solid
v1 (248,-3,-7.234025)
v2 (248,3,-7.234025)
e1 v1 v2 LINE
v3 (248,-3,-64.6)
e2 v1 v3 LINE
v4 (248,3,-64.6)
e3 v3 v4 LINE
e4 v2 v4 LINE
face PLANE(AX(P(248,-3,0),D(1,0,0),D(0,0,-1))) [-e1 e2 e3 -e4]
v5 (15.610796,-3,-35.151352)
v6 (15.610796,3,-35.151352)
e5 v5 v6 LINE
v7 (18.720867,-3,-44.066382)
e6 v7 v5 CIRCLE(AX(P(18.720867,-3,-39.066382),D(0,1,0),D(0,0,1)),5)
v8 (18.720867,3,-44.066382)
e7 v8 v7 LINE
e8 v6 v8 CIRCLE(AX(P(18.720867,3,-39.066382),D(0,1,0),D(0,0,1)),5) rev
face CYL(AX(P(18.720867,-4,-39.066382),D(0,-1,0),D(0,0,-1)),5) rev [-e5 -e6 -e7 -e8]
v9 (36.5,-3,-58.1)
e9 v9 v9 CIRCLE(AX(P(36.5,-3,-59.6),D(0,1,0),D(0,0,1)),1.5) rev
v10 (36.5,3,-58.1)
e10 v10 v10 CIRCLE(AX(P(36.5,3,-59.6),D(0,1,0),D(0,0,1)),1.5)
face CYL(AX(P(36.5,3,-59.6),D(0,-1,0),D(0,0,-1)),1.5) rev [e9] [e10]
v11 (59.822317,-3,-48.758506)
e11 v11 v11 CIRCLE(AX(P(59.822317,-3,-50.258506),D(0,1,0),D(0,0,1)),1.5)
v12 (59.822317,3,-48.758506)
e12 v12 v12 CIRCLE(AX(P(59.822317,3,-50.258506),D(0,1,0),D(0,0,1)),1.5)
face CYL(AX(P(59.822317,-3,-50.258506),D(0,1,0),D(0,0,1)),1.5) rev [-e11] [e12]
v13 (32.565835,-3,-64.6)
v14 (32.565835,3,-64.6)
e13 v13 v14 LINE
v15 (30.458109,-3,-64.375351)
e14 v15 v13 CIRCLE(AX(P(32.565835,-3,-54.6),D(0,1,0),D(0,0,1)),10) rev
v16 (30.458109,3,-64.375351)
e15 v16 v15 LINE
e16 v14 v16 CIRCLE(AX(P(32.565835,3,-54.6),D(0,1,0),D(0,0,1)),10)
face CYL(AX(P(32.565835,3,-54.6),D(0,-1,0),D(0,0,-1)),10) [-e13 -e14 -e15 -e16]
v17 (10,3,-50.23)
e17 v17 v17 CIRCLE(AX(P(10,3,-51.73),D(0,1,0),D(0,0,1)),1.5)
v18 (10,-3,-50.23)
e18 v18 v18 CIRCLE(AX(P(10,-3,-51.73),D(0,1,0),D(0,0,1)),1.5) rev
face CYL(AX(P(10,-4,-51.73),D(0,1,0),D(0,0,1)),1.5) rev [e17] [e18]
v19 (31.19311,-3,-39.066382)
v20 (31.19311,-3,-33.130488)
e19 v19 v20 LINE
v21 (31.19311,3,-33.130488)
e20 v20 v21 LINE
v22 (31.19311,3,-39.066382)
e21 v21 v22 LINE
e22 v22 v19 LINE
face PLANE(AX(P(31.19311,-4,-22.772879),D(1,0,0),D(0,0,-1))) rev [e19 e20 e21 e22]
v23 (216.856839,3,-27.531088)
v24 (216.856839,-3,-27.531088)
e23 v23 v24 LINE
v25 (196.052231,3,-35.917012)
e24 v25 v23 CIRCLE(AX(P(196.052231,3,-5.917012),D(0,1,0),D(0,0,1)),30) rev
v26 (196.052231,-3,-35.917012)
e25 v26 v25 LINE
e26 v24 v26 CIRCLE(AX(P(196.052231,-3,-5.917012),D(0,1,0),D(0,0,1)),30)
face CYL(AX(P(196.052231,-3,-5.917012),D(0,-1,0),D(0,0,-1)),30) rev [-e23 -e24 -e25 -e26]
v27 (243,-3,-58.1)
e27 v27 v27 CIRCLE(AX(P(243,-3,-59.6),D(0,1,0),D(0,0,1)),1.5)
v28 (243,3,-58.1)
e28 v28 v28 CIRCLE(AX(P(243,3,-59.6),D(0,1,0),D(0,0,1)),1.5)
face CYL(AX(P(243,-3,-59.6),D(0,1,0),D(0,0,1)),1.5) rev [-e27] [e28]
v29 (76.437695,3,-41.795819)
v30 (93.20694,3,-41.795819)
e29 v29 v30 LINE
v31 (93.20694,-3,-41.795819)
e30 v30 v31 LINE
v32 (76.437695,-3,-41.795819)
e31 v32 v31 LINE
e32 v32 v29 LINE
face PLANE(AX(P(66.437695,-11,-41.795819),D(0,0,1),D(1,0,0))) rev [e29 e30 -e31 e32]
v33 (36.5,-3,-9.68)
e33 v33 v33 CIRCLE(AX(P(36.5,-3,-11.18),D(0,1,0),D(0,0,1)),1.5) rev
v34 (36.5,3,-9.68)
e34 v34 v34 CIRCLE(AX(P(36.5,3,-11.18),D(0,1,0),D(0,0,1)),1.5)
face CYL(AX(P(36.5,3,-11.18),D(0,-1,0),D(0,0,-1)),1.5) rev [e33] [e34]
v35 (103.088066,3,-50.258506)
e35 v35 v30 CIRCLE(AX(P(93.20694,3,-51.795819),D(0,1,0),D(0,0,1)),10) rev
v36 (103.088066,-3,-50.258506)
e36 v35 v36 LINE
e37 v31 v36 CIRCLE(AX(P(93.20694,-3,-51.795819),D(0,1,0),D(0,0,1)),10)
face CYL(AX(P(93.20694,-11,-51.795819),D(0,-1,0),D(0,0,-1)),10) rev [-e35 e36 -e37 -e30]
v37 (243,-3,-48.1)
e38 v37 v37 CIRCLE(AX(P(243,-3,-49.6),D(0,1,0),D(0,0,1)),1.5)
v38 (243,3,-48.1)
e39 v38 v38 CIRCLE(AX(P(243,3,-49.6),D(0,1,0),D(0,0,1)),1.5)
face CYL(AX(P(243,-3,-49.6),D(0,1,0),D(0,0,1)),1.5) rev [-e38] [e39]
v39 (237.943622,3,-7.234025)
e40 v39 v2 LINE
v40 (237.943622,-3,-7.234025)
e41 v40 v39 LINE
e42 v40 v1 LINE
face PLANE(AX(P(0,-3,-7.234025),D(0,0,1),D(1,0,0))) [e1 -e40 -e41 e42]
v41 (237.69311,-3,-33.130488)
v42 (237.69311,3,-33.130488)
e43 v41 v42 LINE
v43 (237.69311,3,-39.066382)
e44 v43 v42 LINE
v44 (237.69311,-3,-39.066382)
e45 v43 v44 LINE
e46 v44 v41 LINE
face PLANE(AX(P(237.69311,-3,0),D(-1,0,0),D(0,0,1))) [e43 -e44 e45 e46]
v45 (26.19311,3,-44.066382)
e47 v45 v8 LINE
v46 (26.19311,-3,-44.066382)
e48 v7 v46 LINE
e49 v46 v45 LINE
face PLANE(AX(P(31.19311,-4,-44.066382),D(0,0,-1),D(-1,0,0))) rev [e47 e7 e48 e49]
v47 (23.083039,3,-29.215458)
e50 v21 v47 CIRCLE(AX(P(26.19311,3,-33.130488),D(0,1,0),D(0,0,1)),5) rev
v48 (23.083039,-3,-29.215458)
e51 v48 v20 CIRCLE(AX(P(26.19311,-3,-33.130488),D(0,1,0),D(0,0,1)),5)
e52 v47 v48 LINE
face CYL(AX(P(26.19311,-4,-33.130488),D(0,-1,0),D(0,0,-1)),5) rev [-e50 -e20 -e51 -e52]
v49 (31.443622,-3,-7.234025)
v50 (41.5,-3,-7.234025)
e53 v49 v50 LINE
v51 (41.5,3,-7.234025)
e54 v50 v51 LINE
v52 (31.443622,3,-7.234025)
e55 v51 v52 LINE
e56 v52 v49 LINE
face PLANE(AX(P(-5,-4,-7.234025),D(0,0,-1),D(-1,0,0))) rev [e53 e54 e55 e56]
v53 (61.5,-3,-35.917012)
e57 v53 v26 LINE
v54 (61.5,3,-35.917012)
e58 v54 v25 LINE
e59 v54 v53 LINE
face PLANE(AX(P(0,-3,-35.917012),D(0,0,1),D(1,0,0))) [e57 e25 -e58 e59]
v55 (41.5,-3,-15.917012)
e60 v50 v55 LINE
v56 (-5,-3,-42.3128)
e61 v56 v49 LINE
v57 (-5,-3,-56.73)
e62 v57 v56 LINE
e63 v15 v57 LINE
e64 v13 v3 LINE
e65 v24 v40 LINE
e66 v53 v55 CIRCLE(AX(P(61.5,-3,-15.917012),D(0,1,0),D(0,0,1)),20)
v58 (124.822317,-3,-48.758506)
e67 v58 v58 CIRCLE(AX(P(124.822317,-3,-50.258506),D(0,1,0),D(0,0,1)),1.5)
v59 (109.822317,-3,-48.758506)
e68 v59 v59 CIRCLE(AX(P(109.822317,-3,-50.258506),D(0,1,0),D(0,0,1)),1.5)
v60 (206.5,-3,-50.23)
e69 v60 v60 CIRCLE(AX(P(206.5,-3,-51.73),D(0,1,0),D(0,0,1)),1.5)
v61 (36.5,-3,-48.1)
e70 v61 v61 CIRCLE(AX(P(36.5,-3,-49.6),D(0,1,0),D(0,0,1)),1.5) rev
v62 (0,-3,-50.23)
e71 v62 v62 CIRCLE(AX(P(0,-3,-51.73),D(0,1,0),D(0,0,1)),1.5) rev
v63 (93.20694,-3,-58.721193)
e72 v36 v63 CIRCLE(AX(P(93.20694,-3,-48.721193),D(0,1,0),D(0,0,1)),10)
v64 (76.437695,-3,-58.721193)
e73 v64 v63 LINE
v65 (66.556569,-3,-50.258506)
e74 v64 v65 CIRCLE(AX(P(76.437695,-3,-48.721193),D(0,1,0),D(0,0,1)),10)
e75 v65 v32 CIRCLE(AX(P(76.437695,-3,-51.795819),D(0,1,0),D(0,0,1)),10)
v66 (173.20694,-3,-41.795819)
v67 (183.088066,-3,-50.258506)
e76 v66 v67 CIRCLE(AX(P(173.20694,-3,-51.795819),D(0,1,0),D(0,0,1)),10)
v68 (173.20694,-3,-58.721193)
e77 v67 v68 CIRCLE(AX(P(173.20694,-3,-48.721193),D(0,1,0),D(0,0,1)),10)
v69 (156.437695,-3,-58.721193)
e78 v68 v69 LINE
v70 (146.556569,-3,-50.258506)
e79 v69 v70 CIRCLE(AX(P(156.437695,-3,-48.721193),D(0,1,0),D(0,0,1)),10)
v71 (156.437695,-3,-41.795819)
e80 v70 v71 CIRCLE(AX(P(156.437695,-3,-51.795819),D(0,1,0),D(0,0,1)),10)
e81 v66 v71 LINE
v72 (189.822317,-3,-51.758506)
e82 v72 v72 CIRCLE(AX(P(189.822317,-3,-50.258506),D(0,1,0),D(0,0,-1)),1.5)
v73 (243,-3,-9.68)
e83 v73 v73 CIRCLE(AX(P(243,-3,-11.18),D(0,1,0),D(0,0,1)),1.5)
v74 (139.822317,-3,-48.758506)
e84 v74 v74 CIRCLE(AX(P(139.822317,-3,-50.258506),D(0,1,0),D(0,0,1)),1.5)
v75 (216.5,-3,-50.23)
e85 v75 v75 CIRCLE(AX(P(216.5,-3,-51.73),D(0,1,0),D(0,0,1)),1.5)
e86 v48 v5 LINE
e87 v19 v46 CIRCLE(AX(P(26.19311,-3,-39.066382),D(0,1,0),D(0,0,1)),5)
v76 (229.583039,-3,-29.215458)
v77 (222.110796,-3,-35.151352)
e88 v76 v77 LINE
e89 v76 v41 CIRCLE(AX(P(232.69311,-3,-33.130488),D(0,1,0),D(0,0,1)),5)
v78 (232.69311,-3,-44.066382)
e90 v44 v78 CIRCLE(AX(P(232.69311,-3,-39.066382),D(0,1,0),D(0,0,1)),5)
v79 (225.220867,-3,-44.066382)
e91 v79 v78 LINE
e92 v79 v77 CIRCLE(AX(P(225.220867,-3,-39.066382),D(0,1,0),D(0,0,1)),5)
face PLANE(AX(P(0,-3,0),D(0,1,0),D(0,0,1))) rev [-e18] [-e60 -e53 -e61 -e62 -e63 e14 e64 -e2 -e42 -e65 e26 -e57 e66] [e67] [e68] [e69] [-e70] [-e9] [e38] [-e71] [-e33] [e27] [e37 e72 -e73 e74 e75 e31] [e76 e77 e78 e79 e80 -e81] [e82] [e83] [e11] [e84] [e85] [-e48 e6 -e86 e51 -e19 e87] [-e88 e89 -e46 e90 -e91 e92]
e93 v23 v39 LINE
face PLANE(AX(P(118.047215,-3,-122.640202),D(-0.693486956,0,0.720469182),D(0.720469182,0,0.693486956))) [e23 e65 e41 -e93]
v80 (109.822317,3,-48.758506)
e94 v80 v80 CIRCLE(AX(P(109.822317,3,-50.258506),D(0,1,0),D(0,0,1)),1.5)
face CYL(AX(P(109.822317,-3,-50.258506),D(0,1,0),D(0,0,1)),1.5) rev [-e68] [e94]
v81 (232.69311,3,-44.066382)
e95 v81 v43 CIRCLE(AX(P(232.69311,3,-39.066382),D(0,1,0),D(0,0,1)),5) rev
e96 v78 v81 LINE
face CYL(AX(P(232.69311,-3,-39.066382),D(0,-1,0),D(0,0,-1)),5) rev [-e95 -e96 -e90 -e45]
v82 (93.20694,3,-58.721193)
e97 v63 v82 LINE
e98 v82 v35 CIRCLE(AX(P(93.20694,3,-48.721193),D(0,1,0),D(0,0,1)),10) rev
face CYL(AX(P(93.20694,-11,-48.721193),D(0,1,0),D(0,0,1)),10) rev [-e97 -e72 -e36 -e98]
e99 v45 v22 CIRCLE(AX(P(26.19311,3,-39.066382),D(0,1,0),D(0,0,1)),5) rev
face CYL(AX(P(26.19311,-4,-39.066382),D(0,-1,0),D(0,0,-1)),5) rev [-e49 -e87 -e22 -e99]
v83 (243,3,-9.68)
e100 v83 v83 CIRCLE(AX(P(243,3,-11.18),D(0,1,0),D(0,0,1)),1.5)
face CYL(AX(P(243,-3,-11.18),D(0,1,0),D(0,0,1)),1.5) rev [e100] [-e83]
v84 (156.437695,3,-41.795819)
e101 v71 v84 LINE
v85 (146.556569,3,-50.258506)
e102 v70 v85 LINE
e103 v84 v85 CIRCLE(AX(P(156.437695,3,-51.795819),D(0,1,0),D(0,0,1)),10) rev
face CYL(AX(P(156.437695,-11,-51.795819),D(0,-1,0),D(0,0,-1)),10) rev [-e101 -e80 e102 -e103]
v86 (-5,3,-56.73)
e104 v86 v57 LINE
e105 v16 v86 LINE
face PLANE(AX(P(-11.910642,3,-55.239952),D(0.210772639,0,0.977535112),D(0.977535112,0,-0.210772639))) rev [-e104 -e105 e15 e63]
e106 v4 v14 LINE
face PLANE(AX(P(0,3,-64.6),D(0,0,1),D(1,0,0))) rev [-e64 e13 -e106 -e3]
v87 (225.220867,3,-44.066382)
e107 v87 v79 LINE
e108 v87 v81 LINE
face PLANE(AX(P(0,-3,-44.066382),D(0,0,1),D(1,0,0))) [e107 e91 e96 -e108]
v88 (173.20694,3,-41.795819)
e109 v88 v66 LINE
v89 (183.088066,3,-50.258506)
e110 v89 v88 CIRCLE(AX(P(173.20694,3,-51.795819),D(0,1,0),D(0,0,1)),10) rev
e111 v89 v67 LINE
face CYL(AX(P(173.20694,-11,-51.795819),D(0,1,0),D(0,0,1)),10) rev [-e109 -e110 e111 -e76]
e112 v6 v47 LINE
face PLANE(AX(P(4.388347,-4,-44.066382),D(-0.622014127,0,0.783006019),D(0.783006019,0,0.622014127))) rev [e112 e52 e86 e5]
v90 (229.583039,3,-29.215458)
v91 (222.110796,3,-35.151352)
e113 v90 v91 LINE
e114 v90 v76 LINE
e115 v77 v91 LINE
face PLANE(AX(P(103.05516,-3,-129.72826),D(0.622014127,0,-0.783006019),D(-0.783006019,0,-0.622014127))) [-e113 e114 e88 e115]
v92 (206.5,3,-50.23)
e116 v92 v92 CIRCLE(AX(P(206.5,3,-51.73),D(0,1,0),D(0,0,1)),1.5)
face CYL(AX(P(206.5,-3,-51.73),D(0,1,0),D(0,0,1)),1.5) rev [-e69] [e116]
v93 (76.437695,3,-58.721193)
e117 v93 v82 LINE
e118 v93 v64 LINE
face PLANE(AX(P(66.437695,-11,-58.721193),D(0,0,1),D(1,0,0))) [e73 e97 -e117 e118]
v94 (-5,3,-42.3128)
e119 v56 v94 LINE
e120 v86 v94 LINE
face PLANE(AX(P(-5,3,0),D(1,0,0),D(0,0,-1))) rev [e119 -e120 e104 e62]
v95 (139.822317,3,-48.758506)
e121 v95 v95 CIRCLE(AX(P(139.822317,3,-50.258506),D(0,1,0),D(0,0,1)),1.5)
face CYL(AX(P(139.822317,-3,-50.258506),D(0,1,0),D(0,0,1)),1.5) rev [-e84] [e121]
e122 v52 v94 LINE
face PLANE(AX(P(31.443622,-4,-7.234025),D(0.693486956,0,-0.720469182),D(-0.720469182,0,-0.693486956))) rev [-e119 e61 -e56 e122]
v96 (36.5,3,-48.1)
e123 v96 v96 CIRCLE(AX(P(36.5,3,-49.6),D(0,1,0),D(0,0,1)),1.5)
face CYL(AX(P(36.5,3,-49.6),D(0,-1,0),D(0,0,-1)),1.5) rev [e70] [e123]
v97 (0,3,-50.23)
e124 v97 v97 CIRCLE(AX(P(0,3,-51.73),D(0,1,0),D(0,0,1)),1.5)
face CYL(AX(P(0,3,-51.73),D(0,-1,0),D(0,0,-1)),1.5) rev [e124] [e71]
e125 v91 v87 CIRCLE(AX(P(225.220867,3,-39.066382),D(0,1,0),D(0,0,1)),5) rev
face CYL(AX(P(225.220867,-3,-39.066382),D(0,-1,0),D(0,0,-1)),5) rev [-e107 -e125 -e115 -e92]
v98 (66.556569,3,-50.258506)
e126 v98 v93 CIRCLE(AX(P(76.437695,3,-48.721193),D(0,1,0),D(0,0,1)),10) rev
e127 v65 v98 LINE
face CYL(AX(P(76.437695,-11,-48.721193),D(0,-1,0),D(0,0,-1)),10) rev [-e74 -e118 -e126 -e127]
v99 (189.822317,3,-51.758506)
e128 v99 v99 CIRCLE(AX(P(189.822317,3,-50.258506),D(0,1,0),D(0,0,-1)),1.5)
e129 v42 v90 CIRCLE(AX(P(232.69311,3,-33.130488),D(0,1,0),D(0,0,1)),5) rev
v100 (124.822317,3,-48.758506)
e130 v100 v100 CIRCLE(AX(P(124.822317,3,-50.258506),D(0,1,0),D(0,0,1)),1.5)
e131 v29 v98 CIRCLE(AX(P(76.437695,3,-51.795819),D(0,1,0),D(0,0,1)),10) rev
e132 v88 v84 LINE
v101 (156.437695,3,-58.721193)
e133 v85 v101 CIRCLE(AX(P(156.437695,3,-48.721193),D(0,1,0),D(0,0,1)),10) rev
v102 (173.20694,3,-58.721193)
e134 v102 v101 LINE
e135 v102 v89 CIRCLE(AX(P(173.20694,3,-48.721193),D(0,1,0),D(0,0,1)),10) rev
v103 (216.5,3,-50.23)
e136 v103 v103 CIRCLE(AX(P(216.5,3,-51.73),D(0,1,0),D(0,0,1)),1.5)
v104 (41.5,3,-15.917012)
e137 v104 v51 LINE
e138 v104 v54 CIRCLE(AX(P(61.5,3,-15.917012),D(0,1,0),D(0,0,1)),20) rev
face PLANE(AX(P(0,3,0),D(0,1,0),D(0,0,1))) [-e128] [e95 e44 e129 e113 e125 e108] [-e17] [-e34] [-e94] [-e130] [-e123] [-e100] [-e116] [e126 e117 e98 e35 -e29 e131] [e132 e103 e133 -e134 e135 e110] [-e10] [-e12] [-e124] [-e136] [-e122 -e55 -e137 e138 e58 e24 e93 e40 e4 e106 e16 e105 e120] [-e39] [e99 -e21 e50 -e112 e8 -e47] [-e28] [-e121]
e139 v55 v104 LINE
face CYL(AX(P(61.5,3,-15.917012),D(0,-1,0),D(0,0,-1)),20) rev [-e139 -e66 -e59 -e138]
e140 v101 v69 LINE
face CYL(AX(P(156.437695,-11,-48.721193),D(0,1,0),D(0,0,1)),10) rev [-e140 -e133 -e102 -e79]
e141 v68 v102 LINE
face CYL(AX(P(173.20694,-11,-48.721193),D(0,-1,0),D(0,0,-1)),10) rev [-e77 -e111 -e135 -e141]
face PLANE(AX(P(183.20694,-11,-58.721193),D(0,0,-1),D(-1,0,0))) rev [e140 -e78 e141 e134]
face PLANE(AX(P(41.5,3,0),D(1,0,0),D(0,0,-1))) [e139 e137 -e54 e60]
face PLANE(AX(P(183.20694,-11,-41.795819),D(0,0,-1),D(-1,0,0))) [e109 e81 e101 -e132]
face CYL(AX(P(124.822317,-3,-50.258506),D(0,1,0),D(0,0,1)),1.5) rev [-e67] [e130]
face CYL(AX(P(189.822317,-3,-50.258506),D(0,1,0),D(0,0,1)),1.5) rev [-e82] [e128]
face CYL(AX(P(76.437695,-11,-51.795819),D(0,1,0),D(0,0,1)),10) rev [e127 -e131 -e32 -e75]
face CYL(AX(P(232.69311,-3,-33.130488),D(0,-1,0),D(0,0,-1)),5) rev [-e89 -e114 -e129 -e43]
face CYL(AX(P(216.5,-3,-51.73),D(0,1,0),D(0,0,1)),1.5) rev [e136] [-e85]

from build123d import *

# Parameters (mm, degrees)
SKETCH1_R           = 1.5
BOSS_EXTRUDE1_DEPTH = 3
SKETCH4_R           = 1.5
CUT_EXTRUDE2_DEPTH  = 7
SKETCH5_W           = 46.5
SKETCH5_H           = 2
CUT_EXTRUDE3_DEPTH  = 7
CUT_EXTRUDE4_DEPTH  = 7
CUT_EXTRUDE5_DEPTH  = 7
BOSS_EXTRUDE2_START = -6
SKETCH8_R           = 1.5
BOSS_EXTRUDE2_DEPTH = 6
SKETCH9_R           = 1.5
CUT_EXTRUDE6_DEPTH  = 6
SKETCH10_R          = 1.5
CUT_EXTRUDE7_DEPTH  = 6
SKETCH11_W          = 36.769244088
SKETCH11_H          = 16.925373541
CUT_EXTRUDE8_DEPTH  = 14
FILLET2_R           = 5
FILLET3_R           = 10
FILLET4_R           = 20
FILLET5_R           = 30
FILLET6_R           = 10


with BuildPart() as part:
    # Sketch1 → Boss-Extrude1 (new body)
    # profile 1 of 4: a face of its own
    with BuildSketch(Plane(origin=(0, 0, 0), x_dir=(1, 0, 0), z_dir=(0, 1, 0))):
        Polygon((5, 16.666723622), (5, 56.73), (-5, 56.73), (-5, 5.234024539), (5, 5.234024539), (31.5, 5.234024539), (41.5, 5.234024539), (41.5, 64.6), (31.5, 64.6), (31.5, 54.48), (31.5, 16.666723622), align=None)
        with Locations(Location((0, 10.18, 0), (0, 0, 270))):
            Circle(SKETCH1_R, mode=Mode.SUBTRACT)
        with Locations(Location((36.5, 11.18, 0), (0, 0, 270))):
            Circle(SKETCH1_R, mode=Mode.SUBTRACT)
        with Locations(Location((0, 51.73, 0), (0, 0, 270))):
            Circle(SKETCH1_R, mode=Mode.SUBTRACT)
        with Locations(Location((36.5, 49.6, 0), (0, 0, 270))):
            Circle(SKETCH1_R, mode=Mode.SUBTRACT)
        with Locations(Location((36.5, 59.6, 0), (0, 0, 270))):
            Circle(SKETCH1_R, mode=Mode.SUBTRACT)
    # profile 2 of 4: a face of its own
    with BuildSketch(Plane(origin=(0, 0, 0), x_dir=(1, 0, 0), z_dir=(0, 1, 0))):
        Polygon((-5, 56.73), (5, 56.73), (31.5, 54.48), (31.5, 64.6), align=None)
    # profile 3 of 4: a face of its own
    with BuildSketch(Plane(origin=(0, 0, 0), x_dir=(1, 0, 0), z_dir=(0, 1, 0))):
        Polygon((5, 16.666723622), (5, 56.73), (-5, 56.73), (-5, 5.234024539), (5, 5.234024539), (31.5, 5.234024539), (41.5, 5.234024539), (41.5, 64.6), (31.5, 64.6), (31.5, 54.48), (31.5, 16.666723622), align=None)
        with Locations(Location((0, 10.18, 0), (0, 0, 270))):
            Circle(SKETCH1_R, mode=Mode.SUBTRACT)
        with Locations(Location((36.5, 11.18, 0), (0, 0, 270))):
            Circle(SKETCH1_R, mode=Mode.SUBTRACT)
        with Locations(Location((0, 51.73, 0), (0, 0, 270))):
            Circle(SKETCH1_R, mode=Mode.SUBTRACT)
        with Locations(Location((36.5, 49.6, 0), (0, 0, 270))):
            Circle(SKETCH1_R, mode=Mode.SUBTRACT)
        with Locations(Location((36.5, 59.6, 0), (0, 0, 270))):
            Circle(SKETCH1_R, mode=Mode.SUBTRACT)
    # profile 4 of 4: a face of its own
    with BuildSketch(Plane(origin=(0, 0, 0), x_dir=(1, 0, 0), z_dir=(0, 1, 0))):
        Polygon((31.5, 54.48), (5, 56.73), (5, 16.666723622), (31.5, 16.666723622), align=None)
    extrude(amount=BOSS_EXTRUDE1_DEPTH)

    # Sketch4 → Cut-Extrude2 (cut)
    with BuildSketch(Plane(origin=(0, 3, 0), x_dir=(1, 0, 0), z_dir=(0, 1, 0))):
        with Locations(Location((10, 51.73, 0), (0, 0, 270))):
            Circle(SKETCH4_R)
    extrude(amount=-CUT_EXTRUDE2_DEPTH, mode=Mode.SUBTRACT)

    # Sketch5 → Cut-Extrude3 (cut)
    with BuildSketch(Plane(origin=(0, 3, 0), x_dir=(1, 0, 0), z_dir=(0, 1, 0))):
        with Locations((18.25, 6.234024539)):
            Rectangle(SKETCH5_W, SKETCH5_H)
    extrude(amount=-CUT_EXTRUDE3_DEPTH, mode=Mode.SUBTRACT)

    # Sketch6 → Cut-Extrude4 (cut)
    with BuildSketch(Plane(origin=(0, 3, 0), x_dir=(1, 0, 0), z_dir=(0, 1, 0))):
        Polygon((31.443621834, 7.234024539), (-5, 42.312799573), (-5, 7.234024539), align=None)
    extrude(amount=-CUT_EXTRUDE4_DEPTH, mode=Mode.SUBTRACT)

    # Sketch7 → Cut-Extrude5 (cut)
    with BuildSketch(Plane(origin=(0, 3, 0), x_dir=(1, 0, 0), z_dir=(0, 1, 0))):
        Polygon((31.193110027, 22.772878628), (31.193110027, 44.066382221), (4.388346681, 44.066382221), align=None)
    extrude(amount=-CUT_EXTRUDE5_DEPTH, mode=Mode.SUBTRACT)

    # Sketch8 → Boss-Extrude2 (add)
    # profile 1 of 3: a face of its own
    with BuildSketch(Plane(origin=(0, 3, 0), x_dir=(1, 0, 0), z_dir=(0, 1, 0)).offset(BOSS_EXTRUDE2_START)):
        Polygon((238, 64.6), (41.5, 64.6), (41.5, 35.917012269), (208.144634928, 35.917012269), (201.5, 42.312799573), (201.5, 56.73), align=None)
    # profile 2 of 3: a face of its own
    with BuildSketch(Plane(origin=(0, 3, 0), x_dir=(1, 0, 0), z_dir=(0, 1, 0)).offset(BOSS_EXTRUDE2_START)):
        Polygon((237.943621834, 7.234024539), (248, 7.234024539), (248, 64.6), (238, 64.6), (201.5, 56.73), (201.5, 42.312799573), align=None)
        with Locations(Location((243, 11.18, 0), (0, 0, 270))):
            Circle(SKETCH8_R, mode=Mode.SUBTRACT)
        with Locations(Location((243, 59.6, 0), (0, 0, 270))):
            Circle(SKETCH8_R, mode=Mode.SUBTRACT)
        with Locations(Location((243, 49.6, 0), (0, 0, 270))):
            Circle(SKETCH8_R, mode=Mode.SUBTRACT)
        with Locations(Location((216.5, 51.73, 0), (0, 0, 270))):
            Circle(SKETCH8_R, mode=Mode.SUBTRACT)
        with Locations(Location((206.5, 51.73, 0), (0, 0, 270))):
            Circle(SKETCH8_R, mode=Mode.SUBTRACT)
        Polygon((237.693110027, 44.066382221), (237.693110027, 22.772878628), (210.888346681, 44.066382221), align=None, mode=Mode.SUBTRACT)
    # profile 3 of 3: a face of its own
    with BuildSketch(Plane(origin=(0, 3, 0), x_dir=(1, 0, 0), z_dir=(0, 1, 0)).offset(BOSS_EXTRUDE2_START)):
        Polygon((41.5, 35.917012269), (41.5, 64.6), (31.5, 64.6), (-5, 56.73), (-5, 42.312799573), (31.443621834, 7.234024539), (41.5, 7.234024539), align=None)
        with Locations(Location((36.5, 11.18, 0), (0, 0, 270))):
            Circle(SKETCH8_R, mode=Mode.SUBTRACT)
        Polygon((31.193110027, 22.772878628), (4.388346681, 44.066382221), (31.193110027, 44.066382221), align=None, mode=Mode.SUBTRACT)
        with Locations(Location((36.5, 49.6, 0), (0, 0, 270))):
            Circle(SKETCH8_R, mode=Mode.SUBTRACT)
        with Locations(Location((0, 51.73, 0), (0, 0, 270))):
            Circle(SKETCH8_R, mode=Mode.SUBTRACT)
        with Locations(Location((10, 51.73, 0), (0, 0, 270))):
            Circle(SKETCH8_R, mode=Mode.SUBTRACT)
        with Locations(Location((36.5, 59.6, 0), (0, 0, 270))):
            Circle(SKETCH8_R, mode=Mode.SUBTRACT)
    extrude(amount=BOSS_EXTRUDE2_DEPTH)

    # Sketch9 → Cut-Extrude6 (cut)
    with BuildSketch(Plane(origin=(0, 3, 0), x_dir=(1, 0, 0), z_dir=(0, 1, 0))):
        with Locations(Location((59.822317464, 50.258506135, 0), (0, 0, 270))):
            Circle(SKETCH9_R)
        with Locations(Location((189.822317464, 50.258506135, 0), (0, 0, 90))):
            Circle(SKETCH9_R)
        with Locations(Location((124.822317464, 50.258506135, 0), (0, 0, 270))):
            Circle(SKETCH9_R)
    extrude(amount=-CUT_EXTRUDE6_DEPTH, mode=Mode.SUBTRACT)

    # Sketch10 → Cut-Extrude7 (cut)
    with BuildSketch(Plane(origin=(0, 3, 0), x_dir=(1, 0, 0), z_dir=(0, 1, 0))):
        with Locations(Location((124.822317464, 50.258506135, 0), (0, 0, 270))):
            Circle(SKETCH10_R)
        with Locations(Location((109.822317464, 50.258506135, 0), (0, 0, 270))):
            Circle(SKETCH10_R)
        with Locations(Location((139.822317464, 50.258506135, 0), (0, 0, 270))):
            Circle(SKETCH10_R)
    extrude(amount=-CUT_EXTRUDE7_DEPTH, mode=Mode.SUBTRACT)

    # Sketch11 → Cut-Extrude8 (cut)
    with BuildSketch(Plane(origin=(0, 3, 0), x_dir=(1, 0, 0), z_dir=(0, 1, 0))):
        with Locations((84.822317464, 50.258506135)):
            Rectangle(SKETCH11_W, SKETCH11_H)
        with Locations((164.822317464, 50.258506135)):
            Rectangle(SKETCH11_W, SKETCH11_H)
    extrude(amount=-CUT_EXTRUDE8_DEPTH, mode=Mode.SUBTRACT)

    # Fillet2
    fillet2_edges = [part.edges().sort_by_distance(p)[0] for p in [
        (237.693110027, 0, -22.772878628),
        (237.693110027, 0, -44.066382221),
        (210.888346681, 0, -44.066382221),
        (31.193110027, 0, -22.772878628),
        (4.388346681, 0, -44.066382221),
        (31.193110027, 0, -44.066382221),
    ]]
    fillet(fillet2_edges, radius=FILLET2_R)

    # Fillet3
    # the kernel refuses this fillet: 10 mm, written as the material it adds along each edge
    with BuildSketch(Plane(origin=(183.206939508, 3, -41.795819364), x_dir=(-1, 0, 0), z_dir=(0, -1, 0)), Plane(origin=(146.43769542, 3, -41.795819364), x_dir=(0, 0, -1), z_dir=(0, -1, 0)), Plane(origin=(146.43769542, 3, -58.721192905), x_dir=(1, 0, 0), z_dir=(0, -1, 0)), Plane(origin=(103.206939508, 3, -41.795819364), x_dir=(-1, 0, 0), z_dir=(0, -1, 0)), Plane(origin=(66.43769542, 3, -58.721192905), x_dir=(1, 0, 0), z_dir=(0, -1, 0)), Plane(origin=(103.206939508, 3, -58.721192905), x_dir=(0, 0, 1), z_dir=(0, -1, 0))) as fillet3_piece_1:
        with BuildLine():
            CenterArc((FILLET3_R, FILLET3_R), FILLET3_R, 180, 90)
            Line((0, FILLET3_R), (0, 0))
            Line((0, 0), (FILLET3_R, 0))
        make_face()
    extrude(amount=6)
    with BuildSketch(Plane(origin=(183.206939508, 3, -58.721192905), x_dir=(-1, 0, 0), z_dir=(0, -1, 0)), Plane(origin=(66.43769542, 3, -41.795819364), x_dir=(1, 0, 0), z_dir=(0, -1, 0))) as fillet3_piece_2:
        with BuildLine():
            CenterArc((FILLET3_R, -FILLET3_R), FILLET3_R, 90, 90)
            Line((0, -FILLET3_R), (0, 0))
            Line((0, 0), (FILLET3_R, 0))
        make_face()
    extrude(amount=6)

    # Fillet4
    fillet4_edges = [part.edges().sort_by_distance(p)[0] for p in [
        (41.5, 0, -35.917012269),
    ]]
    fillet(fillet4_edges, radius=FILLET4_R)

    # Fillet5
    fillet5_edges = [part.edges().sort_by_distance(p)[0] for p in [
        (208.144634928, 0, -35.917012269),
    ]]
    fillet(fillet5_edges, radius=FILLET5_R)

    # Fillet6
    fillet6_edges = [part.edges().sort_by_distance(p)[0] for p in [
        (31.5, 0, -64.6),
    ]]
    fillet(fillet6_edges, radius=FILLET6_R)


solid = part.part
